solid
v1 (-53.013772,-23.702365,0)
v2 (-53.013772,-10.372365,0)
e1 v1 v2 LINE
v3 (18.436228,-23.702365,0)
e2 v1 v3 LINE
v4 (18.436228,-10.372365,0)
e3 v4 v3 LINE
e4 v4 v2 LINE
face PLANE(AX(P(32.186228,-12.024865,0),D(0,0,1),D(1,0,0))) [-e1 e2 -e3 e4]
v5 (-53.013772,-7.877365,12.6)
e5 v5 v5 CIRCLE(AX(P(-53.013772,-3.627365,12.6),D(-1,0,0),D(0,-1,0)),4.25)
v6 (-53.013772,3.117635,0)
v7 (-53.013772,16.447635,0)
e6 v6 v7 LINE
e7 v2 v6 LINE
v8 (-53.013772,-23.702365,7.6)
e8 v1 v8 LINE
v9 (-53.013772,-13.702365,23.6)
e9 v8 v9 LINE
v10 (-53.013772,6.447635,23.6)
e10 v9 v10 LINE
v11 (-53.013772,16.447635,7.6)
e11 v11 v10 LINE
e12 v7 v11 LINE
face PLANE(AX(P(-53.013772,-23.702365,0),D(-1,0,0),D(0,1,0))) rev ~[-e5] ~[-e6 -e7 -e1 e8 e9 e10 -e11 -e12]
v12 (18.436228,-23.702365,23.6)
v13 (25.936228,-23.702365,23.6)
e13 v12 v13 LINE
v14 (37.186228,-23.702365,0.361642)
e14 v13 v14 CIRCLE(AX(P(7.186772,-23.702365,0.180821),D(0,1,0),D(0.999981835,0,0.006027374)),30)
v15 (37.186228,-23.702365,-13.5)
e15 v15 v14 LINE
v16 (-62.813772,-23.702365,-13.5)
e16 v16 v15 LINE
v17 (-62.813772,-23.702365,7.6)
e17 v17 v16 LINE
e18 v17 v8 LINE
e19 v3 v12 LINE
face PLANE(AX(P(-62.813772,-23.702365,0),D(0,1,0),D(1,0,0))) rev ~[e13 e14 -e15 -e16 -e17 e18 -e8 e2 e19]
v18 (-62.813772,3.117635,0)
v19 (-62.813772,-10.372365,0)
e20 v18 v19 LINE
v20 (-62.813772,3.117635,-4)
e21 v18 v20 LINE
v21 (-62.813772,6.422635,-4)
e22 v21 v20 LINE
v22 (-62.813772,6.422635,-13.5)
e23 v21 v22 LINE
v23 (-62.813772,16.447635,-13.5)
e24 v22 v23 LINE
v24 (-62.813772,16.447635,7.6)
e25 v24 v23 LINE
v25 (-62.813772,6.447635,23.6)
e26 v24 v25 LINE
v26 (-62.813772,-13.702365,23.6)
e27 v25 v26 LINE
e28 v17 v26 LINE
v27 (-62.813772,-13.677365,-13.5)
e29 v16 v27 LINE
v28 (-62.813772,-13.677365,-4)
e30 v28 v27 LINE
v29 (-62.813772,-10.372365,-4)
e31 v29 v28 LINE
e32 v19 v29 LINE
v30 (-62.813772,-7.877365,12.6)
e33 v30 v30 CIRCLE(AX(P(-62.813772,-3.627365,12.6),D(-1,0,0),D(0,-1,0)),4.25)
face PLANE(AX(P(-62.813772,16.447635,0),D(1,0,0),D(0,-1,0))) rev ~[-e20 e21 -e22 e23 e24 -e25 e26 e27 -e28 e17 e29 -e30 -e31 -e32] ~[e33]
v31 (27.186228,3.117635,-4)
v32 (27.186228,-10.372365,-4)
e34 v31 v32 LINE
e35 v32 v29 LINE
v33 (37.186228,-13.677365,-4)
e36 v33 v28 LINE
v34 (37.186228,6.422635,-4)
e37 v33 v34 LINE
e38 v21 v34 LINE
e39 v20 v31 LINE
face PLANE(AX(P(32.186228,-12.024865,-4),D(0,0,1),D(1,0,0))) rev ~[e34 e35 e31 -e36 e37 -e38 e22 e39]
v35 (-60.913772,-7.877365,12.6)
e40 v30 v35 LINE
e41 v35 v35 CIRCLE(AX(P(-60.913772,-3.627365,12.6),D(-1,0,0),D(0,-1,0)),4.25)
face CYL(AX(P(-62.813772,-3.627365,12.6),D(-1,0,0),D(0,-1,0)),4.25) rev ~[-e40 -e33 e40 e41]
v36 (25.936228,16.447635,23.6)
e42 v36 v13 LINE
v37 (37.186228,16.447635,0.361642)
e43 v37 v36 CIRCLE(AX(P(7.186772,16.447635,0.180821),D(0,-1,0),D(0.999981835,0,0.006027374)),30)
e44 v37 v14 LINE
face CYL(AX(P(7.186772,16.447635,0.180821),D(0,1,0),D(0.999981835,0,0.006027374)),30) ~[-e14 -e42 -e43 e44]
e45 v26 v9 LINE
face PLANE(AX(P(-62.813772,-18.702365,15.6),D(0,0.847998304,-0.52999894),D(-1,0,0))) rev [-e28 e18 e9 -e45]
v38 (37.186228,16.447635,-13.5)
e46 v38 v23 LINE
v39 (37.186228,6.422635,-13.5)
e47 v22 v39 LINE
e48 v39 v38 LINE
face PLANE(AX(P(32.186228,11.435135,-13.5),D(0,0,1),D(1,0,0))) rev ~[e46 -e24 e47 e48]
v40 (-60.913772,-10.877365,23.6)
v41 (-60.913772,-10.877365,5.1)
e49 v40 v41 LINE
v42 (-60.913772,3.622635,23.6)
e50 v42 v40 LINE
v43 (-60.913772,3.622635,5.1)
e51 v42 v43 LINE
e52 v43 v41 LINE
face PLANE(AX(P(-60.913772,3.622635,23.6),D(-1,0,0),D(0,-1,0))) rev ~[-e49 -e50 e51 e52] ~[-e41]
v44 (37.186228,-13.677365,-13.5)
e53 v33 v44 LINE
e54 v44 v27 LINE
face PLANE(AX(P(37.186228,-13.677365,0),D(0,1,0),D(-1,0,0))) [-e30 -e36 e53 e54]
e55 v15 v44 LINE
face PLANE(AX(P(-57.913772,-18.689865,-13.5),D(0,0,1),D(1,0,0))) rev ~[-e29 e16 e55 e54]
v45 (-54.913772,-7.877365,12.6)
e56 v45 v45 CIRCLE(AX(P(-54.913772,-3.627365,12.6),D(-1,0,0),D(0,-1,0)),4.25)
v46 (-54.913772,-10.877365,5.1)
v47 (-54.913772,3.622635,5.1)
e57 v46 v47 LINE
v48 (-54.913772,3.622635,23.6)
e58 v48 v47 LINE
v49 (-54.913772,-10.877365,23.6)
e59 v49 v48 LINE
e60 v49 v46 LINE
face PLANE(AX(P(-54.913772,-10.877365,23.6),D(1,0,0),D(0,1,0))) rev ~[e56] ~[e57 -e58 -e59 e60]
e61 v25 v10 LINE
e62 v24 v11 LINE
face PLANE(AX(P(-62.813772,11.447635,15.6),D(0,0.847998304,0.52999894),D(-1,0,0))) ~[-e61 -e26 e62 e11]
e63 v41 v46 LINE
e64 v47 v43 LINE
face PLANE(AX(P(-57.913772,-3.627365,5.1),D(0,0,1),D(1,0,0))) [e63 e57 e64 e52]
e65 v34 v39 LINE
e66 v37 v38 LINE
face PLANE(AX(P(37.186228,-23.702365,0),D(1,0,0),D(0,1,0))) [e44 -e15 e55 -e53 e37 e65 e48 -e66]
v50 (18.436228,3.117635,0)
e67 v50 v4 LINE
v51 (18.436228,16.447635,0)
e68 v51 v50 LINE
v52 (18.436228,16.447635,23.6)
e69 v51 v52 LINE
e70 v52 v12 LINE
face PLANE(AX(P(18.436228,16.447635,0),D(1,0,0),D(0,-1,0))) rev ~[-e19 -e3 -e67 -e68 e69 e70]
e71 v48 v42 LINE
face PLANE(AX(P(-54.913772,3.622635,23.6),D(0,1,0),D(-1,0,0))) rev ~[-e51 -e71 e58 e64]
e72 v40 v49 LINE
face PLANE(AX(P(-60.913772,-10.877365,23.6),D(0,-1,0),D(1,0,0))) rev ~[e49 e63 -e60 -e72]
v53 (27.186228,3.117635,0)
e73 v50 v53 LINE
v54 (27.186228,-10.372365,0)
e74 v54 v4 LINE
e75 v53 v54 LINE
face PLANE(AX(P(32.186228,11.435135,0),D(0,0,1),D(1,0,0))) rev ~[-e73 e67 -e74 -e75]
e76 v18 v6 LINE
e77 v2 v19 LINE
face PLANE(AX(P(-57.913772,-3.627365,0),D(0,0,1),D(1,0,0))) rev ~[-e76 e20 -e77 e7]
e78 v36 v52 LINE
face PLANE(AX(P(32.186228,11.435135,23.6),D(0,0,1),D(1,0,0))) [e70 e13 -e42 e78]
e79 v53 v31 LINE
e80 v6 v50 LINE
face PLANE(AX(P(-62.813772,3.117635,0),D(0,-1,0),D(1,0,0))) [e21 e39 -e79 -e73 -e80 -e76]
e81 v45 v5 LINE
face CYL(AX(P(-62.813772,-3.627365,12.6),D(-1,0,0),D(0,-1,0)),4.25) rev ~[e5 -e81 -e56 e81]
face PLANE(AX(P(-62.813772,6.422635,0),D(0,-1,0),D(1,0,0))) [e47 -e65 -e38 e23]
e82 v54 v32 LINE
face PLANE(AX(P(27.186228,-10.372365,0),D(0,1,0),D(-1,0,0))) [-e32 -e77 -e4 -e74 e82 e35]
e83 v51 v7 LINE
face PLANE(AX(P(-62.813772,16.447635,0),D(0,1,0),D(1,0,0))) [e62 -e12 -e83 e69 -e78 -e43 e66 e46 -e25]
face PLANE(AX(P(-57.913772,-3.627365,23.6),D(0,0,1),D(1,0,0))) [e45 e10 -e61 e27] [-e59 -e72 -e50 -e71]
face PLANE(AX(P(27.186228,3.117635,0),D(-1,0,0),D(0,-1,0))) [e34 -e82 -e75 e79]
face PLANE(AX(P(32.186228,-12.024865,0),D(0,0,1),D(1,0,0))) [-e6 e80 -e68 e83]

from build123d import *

# Parameters (mm, degrees)
F0_W       = 10
F0_H       = 3.305
F0_W_2     = 71.45
F0_W_3     = 8.75
F0_H_2     = 10.025
F0_W_4     = 9.8
F1_DEPTH   = 4
F2_DEPTH   = 13.5
F3_DEPTH   = 23.6
F4_SIZE2   = 10
F4_SIZE    = 16
F4_2_SIZE2 = 10
F4_2_SIZE  = 16
F6_DEPTH   = 40.151
F7_R       = 4.25
F8_DEPTH   = 25
F10_DEPTH  = 18.5


with BuildPart() as f1:
    # F0 (on Top) → F1 (new body)
    with BuildSketch(Plane.XY):
        with Locations((32.1862275445, -12.024865455)):
            Rectangle(F0_W, F0_H)
        with Locations((-17.2887724555, -12.024865455)):
            Rectangle(F0_W_2, F0_H)
        with Locations((22.8112275445, -12.024865455)):
            Rectangle(F0_W_3, F0_H)
        with Locations((22.8112275445, -18.689865455)):
            Rectangle(F0_W_3, F0_H_2)
        with Locations((32.1862275445, -18.689865455)):
            Rectangle(F0_W, F0_H_2)
        with Locations((-17.2887724555, -18.689865455)):
            Rectangle(F0_W_2, F0_H_2)
        with Locations((-57.9137724555, -18.689865455)):
            Rectangle(F0_W_4, F0_H_2)
        with Locations((-57.9137724555, -12.024865455)):
            Rectangle(F0_W_4, F0_H)
        with Locations((-57.9137724555, 4.770134545)):
            Rectangle(F0_W_4, F0_H)
        with Locations((-57.9137724555, 11.435134545)):
            Rectangle(F0_W_4, F0_H_2)
        with Locations((-17.2887724555, 11.435134545)):
            Rectangle(F0_W_2, F0_H_2)
        with Locations((-17.2887724555, 4.770134545)):
            Rectangle(F0_W_2, F0_H)
        with Locations((22.8112275445, 11.435134545)):
            Rectangle(F0_W_3, F0_H_2)
        with Locations((22.8112275445, 4.770134545)):
            Rectangle(F0_W_3, F0_H)
        with Locations((32.1862275445, 4.770134545)):
            Rectangle(F0_W, F0_H)
        with Locations((32.1862275445, 11.435134545)):
            Rectangle(F0_W, F0_H_2)
        Polygon((37.1862275445, 3.117634545), (27.1862275445, 3.117634545), (27.1862275445, -3.627365455), (27.1862275445, -10.372365455), (37.1862275445, -10.372365455), align=None)
    extrude(amount=-F1_DEPTH)

    # F0 (on Top) → F2 (join)
    with BuildSketch(Plane.XY):
        with Locations((-57.9137724555, -18.689865455)):
            Rectangle(F0_W_4, F0_H_2)
        with Locations((-17.2887724555, -18.689865455)):
            Rectangle(F0_W_2, F0_H_2)
        with Locations((22.8112275445, -18.689865455)):
            Rectangle(F0_W_3, F0_H_2)
        with Locations((32.1862275445, -18.689865455)):
            Rectangle(F0_W, F0_H_2)
        with Locations((32.1862275445, 11.435134545)):
            Rectangle(F0_W, F0_H_2)
        with Locations((22.8112275445, 11.435134545)):
            Rectangle(F0_W_3, F0_H_2)
        with Locations((-17.2887724555, 11.435134545)):
            Rectangle(F0_W_2, F0_H_2)
        with Locations((-57.9137724555, 11.435134545)):
            Rectangle(F0_W_4, F0_H_2)
    extrude(amount=-F2_DEPTH)

    # F0 (on Top) → F3 (join)
    with BuildSketch(Plane.XY):
        Polygon((-53.0137724555, 3.117634545), (-62.8137724555, 3.117634545), (-62.8137724555, -10.372365455), (-53.0137724555, -10.372365455), (-53.0137724555, -3.627365455), align=None)
        with Locations((-57.9137724555, -12.024865455)):
            Rectangle(F0_W_4, F0_H)
        with Locations((-57.9137724555, -18.689865455)):
            Rectangle(F0_W_4, F0_H_2)
        with Locations((-57.9137724555, 4.770134545)):
            Rectangle(F0_W_4, F0_H)
        with Locations((-57.9137724555, 11.435134545)):
            Rectangle(F0_W_4, F0_H_2)
        with Locations((32.1862275445, 11.435134545)):
            Rectangle(F0_W, F0_H_2)
        with Locations((22.8112275445, 4.770134545)):
            Rectangle(F0_W_3, F0_H)
        with Locations((22.8112275445, 11.435134545)):
            Rectangle(F0_W_3, F0_H_2)
        Polygon((27.1862275445, 3.117634545), (18.4362275445, 3.117634545), (18.4362275445, -3.627365455), (18.4362275445, -10.372365455), (27.1862275445, -10.372365455), (27.1862275445, -3.627365455), align=None)
        with Locations((22.8112275445, -18.689865455)):
            Rectangle(F0_W_3, F0_H_2)
        with Locations((22.8112275445, -12.024865455)):
            Rectangle(F0_W_3, F0_H)
        with Locations((32.1862275445, -18.689865455)):
            Rectangle(F0_W, F0_H_2)
        with Locations((32.1862275445, -12.024865455)):
            Rectangle(F0_W, F0_H)
        Polygon((37.1862275445, 3.117634545), (27.1862275445, 3.117634545), (27.1862275445, -3.627365455), (27.1862275445, -10.372365455), (37.1862275445, -10.372365455), align=None)
        with Locations((32.1862275445, 4.770134545)):
            Rectangle(F0_W, F0_H)
    extrude(amount=F3_DEPTH)

    # F4
    f4_edges = [f1.edges().sort_by_distance(p)[0] for p in [
        (-57.913772, 16.447635, 23.6),
    ]]
    f4_side = f1.faces().sort_by_distance((-9.085188, 16.447635, -0.574122))[0]
    chamfer(f4_edges, length=F4_SIZE, length2=F4_SIZE2, reference=f4_side)

    # F4#2
    f4_2_edges = [f1.edges().sort_by_distance(p)[0] for p in [
        (-57.913772, -23.702365, 23.6),
    ]]
    f4_2_side = f1.faces().sort_by_distance((-9.085188, -23.702365, -0.574122))[0]
    chamfer(f4_2_edges, length=F4_2_SIZE, length2=F4_2_SIZE2, reference=f4_2_side)

    # F5 (on face) → F6 (cut, through all)
    with BuildSketch(Plane(origin=(0, 16.447634545, 0), x_dir=(-1, 0, 0), z_dir=(0, 1, 0))):
        with BuildLine():
            ThreePointArc((-37.1862275445, 0.3616424249), (-34.1889830456, 13.252952829), (-25.9362275445, 23.6))
            Line((-25.9362275445, 23.6), (-37.1862275445, 23.6))
            Line((-37.1862275445, 23.6), (-37.1862275445, 0.3616424249))
        make_face()
    extrude(amount=-F6_DEPTH, mode=Mode.SUBTRACT)

    # F7 (on face) → F8 (cut)
    with BuildSketch(Plane(origin=(-62.8137724555, 0, 0), x_dir=(0, -1, 0), z_dir=(-1, 0, 0))):
        with Locations((3.627365455, 12.6)):
            Circle(F7_R)
    extrude(amount=-F8_DEPTH, mode=Mode.SUBTRACT)

    # F9 (on face) → F10 (cut)
    with BuildSketch(Plane.XY.offset(23.6)):
        Polygon((-54.9137724555, -10.877365455), (-54.9137724555, -3.627365455), (-54.9137724555, 3.622634545), (-57.9137724555, 3.622634545), (-60.9137724555, 3.622634545), (-60.9137724555, -3.627365455), (-60.9137724555, -10.877365455), (-57.9137724555, -10.877365455), align=None)
    extrude(amount=-F10_DEPTH, mode=Mode.SUBTRACT)


solid = f1.part
